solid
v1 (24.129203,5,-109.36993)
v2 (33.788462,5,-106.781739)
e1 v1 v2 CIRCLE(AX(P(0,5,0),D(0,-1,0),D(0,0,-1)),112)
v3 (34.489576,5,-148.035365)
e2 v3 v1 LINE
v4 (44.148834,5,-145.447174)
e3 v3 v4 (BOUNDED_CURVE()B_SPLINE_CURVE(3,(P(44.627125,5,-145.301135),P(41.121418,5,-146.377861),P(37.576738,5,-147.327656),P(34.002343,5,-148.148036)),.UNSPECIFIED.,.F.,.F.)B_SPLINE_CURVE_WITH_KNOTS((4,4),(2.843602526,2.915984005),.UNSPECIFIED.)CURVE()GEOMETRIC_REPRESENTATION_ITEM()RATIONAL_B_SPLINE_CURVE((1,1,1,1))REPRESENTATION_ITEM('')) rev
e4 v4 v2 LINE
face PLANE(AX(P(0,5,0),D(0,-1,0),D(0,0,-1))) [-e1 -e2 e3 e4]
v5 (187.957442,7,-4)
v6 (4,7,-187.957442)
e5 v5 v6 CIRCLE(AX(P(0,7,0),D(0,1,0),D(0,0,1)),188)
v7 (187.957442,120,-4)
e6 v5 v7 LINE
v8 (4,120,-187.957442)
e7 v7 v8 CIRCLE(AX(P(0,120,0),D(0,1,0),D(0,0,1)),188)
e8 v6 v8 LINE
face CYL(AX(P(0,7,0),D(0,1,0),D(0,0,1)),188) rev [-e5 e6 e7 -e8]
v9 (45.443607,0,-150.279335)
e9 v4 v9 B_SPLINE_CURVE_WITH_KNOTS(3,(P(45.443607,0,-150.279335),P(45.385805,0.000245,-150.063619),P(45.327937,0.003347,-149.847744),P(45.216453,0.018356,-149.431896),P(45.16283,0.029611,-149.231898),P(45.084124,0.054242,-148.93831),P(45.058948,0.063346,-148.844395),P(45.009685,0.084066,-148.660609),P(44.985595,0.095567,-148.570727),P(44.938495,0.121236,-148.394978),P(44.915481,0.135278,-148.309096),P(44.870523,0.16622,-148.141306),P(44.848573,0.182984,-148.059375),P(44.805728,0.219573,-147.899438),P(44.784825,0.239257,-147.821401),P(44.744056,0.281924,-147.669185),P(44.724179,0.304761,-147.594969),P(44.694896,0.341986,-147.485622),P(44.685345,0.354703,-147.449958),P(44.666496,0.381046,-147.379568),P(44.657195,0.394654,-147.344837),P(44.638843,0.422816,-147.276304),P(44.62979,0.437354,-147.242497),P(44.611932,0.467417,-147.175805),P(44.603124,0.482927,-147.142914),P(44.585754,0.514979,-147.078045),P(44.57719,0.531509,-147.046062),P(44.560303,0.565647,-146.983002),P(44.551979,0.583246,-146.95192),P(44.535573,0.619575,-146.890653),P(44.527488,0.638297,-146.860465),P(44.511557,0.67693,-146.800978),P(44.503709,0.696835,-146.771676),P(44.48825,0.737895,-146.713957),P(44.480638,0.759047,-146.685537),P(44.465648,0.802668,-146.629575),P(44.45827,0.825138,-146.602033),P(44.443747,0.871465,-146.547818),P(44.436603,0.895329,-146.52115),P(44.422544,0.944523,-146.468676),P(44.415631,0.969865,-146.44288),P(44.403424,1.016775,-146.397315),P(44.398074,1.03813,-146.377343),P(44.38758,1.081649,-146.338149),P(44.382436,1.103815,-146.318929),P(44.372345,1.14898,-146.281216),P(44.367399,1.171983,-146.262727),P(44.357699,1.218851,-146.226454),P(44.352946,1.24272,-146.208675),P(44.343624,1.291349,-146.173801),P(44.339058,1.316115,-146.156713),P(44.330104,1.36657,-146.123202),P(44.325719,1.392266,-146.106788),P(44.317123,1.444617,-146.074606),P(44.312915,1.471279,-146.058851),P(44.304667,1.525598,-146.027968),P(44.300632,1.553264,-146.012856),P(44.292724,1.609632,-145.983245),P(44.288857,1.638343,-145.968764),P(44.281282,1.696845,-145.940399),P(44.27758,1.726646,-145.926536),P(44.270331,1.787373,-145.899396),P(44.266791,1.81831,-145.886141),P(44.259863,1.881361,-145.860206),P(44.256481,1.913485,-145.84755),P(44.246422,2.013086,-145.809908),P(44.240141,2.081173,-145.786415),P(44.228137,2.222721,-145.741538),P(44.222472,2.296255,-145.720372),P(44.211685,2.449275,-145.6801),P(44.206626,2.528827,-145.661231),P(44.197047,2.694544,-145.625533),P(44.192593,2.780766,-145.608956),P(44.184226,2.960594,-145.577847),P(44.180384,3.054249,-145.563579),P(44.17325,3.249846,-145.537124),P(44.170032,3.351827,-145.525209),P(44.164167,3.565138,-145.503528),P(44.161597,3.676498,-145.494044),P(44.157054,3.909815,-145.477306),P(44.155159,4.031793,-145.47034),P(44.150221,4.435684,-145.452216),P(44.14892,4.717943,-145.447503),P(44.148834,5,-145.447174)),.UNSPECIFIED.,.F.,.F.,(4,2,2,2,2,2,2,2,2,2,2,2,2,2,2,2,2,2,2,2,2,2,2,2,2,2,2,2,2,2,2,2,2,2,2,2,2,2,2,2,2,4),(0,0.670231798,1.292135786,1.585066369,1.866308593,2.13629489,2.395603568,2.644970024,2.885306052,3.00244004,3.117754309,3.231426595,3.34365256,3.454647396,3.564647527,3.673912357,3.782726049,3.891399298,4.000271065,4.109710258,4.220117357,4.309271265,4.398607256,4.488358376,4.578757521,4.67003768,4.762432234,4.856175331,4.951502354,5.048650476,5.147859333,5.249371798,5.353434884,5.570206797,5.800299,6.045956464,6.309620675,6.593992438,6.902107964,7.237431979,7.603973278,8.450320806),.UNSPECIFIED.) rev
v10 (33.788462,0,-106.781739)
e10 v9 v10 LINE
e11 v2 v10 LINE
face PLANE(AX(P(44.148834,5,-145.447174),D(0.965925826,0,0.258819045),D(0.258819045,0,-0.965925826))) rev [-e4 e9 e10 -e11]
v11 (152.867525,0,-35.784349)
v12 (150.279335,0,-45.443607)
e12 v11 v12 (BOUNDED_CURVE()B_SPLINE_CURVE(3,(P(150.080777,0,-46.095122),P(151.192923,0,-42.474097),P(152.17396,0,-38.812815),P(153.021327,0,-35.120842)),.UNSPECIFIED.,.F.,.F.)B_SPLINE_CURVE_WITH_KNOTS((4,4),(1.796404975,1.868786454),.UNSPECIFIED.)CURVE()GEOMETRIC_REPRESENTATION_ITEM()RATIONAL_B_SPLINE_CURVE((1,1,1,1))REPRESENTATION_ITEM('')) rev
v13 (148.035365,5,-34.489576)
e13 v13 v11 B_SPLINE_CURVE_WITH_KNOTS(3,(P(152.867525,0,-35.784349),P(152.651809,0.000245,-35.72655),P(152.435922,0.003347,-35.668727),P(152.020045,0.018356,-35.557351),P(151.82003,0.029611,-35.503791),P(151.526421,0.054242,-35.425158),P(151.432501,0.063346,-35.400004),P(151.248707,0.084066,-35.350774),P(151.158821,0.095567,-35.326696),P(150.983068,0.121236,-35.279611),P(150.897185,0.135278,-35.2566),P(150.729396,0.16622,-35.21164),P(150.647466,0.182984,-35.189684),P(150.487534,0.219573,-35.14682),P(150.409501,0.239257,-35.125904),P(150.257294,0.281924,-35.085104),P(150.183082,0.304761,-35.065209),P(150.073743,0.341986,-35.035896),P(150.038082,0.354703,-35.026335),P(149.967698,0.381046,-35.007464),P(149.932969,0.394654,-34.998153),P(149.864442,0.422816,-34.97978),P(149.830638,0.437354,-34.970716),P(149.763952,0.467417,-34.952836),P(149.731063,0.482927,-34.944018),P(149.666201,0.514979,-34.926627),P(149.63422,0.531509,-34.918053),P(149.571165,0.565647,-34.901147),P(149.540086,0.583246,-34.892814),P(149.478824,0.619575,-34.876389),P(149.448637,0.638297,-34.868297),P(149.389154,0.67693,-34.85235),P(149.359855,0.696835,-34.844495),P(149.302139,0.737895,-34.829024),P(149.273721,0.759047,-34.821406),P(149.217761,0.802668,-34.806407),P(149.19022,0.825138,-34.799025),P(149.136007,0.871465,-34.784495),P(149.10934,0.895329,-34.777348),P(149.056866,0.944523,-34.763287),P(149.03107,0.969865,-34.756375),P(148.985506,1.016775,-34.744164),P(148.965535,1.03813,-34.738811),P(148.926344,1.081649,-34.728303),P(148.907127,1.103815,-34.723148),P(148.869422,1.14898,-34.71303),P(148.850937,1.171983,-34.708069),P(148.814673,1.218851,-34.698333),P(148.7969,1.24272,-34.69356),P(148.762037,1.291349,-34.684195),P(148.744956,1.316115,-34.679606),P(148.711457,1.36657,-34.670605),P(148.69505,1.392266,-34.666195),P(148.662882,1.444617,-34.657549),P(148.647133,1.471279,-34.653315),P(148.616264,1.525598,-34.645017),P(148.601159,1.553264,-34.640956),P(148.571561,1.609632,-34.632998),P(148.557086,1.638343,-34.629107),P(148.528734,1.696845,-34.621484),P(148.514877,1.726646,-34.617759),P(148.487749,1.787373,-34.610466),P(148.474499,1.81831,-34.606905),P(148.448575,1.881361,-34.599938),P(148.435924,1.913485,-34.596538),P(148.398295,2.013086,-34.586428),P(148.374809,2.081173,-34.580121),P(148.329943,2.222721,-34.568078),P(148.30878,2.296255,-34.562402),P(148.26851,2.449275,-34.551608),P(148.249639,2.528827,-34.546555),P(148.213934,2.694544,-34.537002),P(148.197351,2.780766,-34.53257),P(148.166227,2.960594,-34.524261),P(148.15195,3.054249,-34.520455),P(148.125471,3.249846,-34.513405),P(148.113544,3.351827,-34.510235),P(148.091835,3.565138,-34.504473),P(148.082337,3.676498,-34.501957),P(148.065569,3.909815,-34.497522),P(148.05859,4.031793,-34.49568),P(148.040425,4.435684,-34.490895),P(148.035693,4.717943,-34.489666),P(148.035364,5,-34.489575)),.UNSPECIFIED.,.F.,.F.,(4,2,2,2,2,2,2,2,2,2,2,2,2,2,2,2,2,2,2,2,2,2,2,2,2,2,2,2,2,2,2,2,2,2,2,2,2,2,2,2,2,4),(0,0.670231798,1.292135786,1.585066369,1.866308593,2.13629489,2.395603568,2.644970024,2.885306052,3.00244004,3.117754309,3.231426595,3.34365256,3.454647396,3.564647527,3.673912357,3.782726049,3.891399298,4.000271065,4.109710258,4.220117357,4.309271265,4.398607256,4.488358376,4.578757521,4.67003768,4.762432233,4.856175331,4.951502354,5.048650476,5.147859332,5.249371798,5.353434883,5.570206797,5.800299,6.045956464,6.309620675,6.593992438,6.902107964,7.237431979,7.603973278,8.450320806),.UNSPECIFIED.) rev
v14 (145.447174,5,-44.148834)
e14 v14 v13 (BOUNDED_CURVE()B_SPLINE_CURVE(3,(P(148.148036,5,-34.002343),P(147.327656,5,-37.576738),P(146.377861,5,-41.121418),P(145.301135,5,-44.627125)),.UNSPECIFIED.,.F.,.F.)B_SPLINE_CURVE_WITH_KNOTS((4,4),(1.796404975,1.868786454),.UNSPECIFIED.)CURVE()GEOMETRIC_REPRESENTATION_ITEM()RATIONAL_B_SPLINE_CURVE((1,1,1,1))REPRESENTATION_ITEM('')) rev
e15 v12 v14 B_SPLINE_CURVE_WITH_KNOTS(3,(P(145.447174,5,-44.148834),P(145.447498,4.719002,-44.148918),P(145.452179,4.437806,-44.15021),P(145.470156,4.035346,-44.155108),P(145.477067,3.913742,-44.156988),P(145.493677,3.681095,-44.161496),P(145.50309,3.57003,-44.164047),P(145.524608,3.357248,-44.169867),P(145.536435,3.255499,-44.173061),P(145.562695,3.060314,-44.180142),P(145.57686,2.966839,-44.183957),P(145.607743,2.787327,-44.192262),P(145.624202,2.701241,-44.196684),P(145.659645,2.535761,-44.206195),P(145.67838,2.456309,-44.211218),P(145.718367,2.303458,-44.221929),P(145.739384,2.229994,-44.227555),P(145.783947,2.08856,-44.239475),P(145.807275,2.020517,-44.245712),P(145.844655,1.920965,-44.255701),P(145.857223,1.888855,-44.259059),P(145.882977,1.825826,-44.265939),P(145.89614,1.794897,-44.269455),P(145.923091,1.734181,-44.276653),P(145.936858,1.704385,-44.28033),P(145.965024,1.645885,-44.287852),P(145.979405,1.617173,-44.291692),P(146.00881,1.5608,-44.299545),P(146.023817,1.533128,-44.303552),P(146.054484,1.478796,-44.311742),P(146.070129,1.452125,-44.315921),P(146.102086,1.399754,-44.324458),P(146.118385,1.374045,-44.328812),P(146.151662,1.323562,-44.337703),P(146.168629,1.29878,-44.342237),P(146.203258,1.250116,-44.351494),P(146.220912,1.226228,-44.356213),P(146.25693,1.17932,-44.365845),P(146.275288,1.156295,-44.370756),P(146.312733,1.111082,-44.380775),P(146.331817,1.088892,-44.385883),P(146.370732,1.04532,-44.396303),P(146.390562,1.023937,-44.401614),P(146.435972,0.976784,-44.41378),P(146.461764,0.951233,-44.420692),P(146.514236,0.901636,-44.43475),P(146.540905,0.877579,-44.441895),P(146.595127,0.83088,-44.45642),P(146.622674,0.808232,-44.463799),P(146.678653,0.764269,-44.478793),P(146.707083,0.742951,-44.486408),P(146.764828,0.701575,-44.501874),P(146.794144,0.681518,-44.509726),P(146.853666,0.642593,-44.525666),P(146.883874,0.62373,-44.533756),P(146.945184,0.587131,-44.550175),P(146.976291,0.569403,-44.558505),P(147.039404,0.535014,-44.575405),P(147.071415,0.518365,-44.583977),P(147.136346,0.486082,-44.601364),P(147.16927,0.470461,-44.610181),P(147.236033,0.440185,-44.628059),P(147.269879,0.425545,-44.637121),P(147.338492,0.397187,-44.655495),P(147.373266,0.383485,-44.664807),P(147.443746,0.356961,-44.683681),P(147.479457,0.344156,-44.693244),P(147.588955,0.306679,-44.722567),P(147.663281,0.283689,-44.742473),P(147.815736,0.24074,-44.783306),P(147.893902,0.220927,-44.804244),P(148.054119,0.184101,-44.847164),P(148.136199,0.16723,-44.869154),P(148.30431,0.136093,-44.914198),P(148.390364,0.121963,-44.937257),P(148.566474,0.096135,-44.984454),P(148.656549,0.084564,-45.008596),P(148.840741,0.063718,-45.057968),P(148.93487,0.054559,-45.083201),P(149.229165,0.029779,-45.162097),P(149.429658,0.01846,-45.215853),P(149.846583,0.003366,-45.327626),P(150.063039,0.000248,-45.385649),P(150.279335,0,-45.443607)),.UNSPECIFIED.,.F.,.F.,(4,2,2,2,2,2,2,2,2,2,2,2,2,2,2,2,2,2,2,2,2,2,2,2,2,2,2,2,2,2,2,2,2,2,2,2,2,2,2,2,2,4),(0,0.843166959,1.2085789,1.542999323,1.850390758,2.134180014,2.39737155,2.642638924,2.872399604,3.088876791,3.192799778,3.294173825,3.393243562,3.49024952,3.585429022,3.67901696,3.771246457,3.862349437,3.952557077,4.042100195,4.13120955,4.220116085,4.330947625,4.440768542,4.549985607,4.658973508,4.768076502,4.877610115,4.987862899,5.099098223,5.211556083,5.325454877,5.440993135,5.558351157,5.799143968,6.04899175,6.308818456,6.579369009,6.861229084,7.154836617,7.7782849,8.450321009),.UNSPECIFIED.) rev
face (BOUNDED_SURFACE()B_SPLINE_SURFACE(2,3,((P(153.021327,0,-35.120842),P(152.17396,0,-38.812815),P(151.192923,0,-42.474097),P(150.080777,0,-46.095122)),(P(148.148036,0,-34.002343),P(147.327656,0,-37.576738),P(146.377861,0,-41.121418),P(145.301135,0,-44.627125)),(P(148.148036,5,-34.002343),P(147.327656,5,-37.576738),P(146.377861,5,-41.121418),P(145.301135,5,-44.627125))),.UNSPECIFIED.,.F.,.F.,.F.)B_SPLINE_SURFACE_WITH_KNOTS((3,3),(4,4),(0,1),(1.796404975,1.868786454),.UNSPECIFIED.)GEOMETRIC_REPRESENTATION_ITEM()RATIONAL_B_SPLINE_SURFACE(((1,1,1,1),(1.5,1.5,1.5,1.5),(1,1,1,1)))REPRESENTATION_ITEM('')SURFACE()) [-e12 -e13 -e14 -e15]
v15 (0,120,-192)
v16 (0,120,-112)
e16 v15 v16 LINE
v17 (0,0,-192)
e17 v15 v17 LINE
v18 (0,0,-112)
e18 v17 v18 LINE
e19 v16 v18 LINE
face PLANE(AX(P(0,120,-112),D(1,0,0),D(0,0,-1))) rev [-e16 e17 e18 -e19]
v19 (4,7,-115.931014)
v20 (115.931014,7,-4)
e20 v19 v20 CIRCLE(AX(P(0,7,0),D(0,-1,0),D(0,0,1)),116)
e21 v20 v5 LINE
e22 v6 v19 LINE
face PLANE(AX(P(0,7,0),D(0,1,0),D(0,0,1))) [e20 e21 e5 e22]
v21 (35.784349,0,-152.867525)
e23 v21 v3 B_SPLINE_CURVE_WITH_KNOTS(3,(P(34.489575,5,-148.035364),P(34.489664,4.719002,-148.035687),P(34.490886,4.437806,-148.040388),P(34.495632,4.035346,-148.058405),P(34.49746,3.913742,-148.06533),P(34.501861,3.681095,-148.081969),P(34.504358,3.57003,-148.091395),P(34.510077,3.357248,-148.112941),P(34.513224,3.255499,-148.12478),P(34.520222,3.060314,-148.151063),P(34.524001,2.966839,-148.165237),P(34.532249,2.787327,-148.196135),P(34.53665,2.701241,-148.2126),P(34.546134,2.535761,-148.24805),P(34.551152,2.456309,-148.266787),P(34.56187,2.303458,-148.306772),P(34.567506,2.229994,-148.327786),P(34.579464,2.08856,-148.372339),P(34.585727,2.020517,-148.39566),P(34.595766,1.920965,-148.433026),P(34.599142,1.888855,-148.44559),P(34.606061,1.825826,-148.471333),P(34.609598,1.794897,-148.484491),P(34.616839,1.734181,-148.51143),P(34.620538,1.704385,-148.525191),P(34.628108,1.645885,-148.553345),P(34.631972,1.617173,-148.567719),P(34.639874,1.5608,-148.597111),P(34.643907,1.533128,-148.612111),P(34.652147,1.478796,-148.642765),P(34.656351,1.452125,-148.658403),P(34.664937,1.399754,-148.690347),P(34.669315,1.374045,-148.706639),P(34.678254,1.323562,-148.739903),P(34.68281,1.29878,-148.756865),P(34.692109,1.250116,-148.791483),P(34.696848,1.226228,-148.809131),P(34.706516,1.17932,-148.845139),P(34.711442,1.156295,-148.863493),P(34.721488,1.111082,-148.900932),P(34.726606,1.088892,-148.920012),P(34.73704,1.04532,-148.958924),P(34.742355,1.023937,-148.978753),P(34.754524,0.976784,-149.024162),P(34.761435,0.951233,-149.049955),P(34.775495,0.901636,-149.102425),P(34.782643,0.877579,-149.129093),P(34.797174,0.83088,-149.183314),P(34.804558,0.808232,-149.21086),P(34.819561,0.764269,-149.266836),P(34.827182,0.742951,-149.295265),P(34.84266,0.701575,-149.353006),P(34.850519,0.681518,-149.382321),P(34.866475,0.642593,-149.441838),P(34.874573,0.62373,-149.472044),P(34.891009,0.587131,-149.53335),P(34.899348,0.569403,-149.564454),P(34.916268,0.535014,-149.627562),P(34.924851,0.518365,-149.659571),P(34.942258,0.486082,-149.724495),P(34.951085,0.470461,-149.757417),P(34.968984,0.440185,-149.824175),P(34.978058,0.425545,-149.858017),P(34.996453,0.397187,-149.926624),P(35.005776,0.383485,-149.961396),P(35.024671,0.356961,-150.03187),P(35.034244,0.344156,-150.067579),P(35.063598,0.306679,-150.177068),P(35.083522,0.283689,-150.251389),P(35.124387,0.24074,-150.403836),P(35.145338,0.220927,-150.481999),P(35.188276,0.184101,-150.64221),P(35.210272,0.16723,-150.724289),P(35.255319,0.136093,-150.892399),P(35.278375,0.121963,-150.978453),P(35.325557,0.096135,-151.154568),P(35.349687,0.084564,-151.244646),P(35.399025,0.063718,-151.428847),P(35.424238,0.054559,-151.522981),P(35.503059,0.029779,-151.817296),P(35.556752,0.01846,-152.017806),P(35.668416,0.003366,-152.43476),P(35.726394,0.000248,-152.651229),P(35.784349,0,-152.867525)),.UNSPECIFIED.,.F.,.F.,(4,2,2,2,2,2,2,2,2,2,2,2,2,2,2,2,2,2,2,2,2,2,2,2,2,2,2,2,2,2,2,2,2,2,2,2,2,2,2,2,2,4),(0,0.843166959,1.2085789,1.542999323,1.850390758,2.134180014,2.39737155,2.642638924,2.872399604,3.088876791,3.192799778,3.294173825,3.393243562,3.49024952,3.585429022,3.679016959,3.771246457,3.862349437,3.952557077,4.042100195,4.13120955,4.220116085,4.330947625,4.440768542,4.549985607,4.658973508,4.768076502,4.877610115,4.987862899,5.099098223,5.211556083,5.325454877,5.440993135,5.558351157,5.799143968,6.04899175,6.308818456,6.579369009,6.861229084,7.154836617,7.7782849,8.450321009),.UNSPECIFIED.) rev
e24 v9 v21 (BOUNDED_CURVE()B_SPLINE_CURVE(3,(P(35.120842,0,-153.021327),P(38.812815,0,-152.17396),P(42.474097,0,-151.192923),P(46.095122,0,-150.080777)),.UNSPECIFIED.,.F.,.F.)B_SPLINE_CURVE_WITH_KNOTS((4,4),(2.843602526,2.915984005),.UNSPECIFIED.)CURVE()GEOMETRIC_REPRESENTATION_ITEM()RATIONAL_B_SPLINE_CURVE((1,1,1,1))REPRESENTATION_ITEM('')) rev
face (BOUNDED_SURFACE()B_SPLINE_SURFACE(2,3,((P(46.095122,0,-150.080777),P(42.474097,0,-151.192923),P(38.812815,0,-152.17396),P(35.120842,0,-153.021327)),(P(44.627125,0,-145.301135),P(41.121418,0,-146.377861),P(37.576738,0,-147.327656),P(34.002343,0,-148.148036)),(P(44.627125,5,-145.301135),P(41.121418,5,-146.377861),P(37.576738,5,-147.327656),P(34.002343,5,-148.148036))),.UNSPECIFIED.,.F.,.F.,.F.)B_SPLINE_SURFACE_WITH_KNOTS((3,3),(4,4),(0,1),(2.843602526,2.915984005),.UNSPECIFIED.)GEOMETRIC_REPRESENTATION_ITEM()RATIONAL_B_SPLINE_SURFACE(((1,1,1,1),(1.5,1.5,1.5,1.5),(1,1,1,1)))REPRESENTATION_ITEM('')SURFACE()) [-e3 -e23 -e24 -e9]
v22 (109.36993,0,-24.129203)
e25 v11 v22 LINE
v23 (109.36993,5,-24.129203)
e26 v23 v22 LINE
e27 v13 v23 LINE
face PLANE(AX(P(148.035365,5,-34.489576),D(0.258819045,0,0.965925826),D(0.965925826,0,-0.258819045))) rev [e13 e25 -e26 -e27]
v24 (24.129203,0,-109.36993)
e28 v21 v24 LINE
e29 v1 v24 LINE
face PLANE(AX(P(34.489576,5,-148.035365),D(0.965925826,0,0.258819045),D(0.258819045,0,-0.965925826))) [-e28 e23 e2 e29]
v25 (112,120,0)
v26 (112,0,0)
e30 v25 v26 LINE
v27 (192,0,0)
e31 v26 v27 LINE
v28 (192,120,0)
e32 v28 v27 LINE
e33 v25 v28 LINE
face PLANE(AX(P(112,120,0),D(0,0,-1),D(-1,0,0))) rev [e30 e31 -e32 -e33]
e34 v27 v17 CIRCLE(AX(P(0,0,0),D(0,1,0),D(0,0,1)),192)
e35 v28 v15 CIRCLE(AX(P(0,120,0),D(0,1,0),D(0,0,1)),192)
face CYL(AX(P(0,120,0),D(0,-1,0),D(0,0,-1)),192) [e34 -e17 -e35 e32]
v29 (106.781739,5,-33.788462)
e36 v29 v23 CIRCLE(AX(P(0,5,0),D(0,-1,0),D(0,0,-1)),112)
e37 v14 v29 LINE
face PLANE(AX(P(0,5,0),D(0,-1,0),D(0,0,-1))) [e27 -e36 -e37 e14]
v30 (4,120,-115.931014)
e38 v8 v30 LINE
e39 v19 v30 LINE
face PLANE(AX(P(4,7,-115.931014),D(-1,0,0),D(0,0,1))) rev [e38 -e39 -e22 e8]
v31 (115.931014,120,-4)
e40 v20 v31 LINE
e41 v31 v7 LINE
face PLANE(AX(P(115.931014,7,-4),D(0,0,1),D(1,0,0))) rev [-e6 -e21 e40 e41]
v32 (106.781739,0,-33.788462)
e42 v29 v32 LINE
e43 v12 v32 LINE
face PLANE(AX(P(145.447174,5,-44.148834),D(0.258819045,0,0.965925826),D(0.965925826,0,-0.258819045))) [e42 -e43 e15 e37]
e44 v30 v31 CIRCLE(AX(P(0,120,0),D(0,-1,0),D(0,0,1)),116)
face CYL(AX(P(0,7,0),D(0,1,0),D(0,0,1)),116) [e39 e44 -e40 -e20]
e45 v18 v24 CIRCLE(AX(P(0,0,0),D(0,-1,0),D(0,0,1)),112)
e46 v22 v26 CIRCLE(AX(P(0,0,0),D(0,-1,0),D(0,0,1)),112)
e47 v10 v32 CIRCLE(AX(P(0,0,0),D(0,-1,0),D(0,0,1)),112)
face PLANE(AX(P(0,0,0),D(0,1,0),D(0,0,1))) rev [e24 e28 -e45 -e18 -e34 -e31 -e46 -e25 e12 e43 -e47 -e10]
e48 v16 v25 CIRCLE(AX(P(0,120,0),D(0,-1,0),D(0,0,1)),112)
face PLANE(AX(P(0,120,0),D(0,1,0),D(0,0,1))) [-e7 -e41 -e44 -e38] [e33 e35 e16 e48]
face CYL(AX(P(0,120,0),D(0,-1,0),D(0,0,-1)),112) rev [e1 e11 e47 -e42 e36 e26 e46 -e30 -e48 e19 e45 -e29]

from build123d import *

# Parameters (mm, degrees)
ESTRUSIONE_ESTRUSIONE1_DEPTH = 120
TAGLIO_ESTRUSIONE1_DEPTH     = 113
TAGLIO_ESTRUSIONE2_DEPTH     = 5
RACCORDO1_SIZE               = 5


with BuildPart() as part:
    # Schizzo1 → Estrusione-Estrusione1 (new body)
    with BuildSketch(Plane(origin=(0, 0, 0), x_dir=(1, 0, 0), z_dir=(0, 1, 0))):
        with BuildLine():
            Line((0, 112), (0, 192))
            ThreePointArc((0, 192), (135.764501988, 135.764501988), (192, 0))
            Line((192, 0), (112, 0))
            ThreePointArc((112, 0), (79.195959493, 79.195959493), (0, 112))
        make_face()
    extrude(amount=ESTRUSIONE_ESTRUSIONE1_DEPTH)

    # Schizzo2 → Taglio-Estrusione1 (cut)
    with BuildSketch(Plane(origin=(0, 120, 0), x_dir=(1, 0, 0), z_dir=(0, 1, 0))):
        with BuildLine():
            Line((4, 115.93101397), (4, 187.957441992))
            ThreePointArc((4, 187.957441992), (132.936074863, 132.936074863), (187.957441992, 4))
            Line((187.957441992, 4), (115.93101397, 4))
            ThreePointArc((115.93101397, 4), (82.024386618, 82.024386618), (4, 115.93101397))
        make_face()
    extrude(amount=-TAGLIO_ESTRUSIONE1_DEPTH, mode=Mode.SUBTRACT)

    # Schizzo3 → Taglio-Estrusione2 (cut)
    with BuildSketch(Plane.XZ):
        with BuildLine():
            Line((34.489575502, -148.035364632), (24.129203459, -109.369929782))
            ThreePointArc((24.129203459, -109.369929782), (28.987733051, -108.183692544), (33.788461722, -106.781739331))
            Line((33.788461722, -106.781739331), (44.148833765, -145.447174181))
            ThreePointArc((44.148833765, -145.447174181), (39.340494856, -146.820725596), (34.489575502, -148.035364632))
        make_face()
        with BuildLine():
            Line((145.447174181, -44.148833765), (106.781739331, -33.788461722))
            ThreePointArc((106.781739331, -33.788461722), (108.183692544, -28.987733051), (109.369929782, -24.129203459))
            Line((109.369929782, -24.129203459), (148.035364632, -34.489575502))
            ThreePointArc((148.035364632, -34.489575502), (146.820725596, -39.340494856), (145.447174181, -44.148833765))
        make_face()
    extrude(amount=-TAGLIO_ESTRUSIONE2_DEPTH, mode=Mode.SUBTRACT)

    # Raccordo1
    # a fillet whose section is not a circle: 5 mm, written as the material it takes off along each edge
    with BuildSketch(Plane(origin=(0, 0, 0), x_dir=(0.9892644198784365, 0, -0.14613660582681076), z_dir=(0.14613660582681076, 0, 0.9892644198784365))) as raccordo1_piece_1_section:
        with BuildLine():
            Bezier((152 + RACCORDO1_SIZE, 0), (152, 0), (152, RACCORDO1_SIZE), weights=[1, 1.5, 1])
            Line((152, RACCORDO1_SIZE), (152, 0))
            Line((152, 0), (152 + RACCORDO1_SIZE, 0))
        make_face()
    raccordo1_piece_1 = revolve(axis=Axis((0, 0, 0), (0, 1, 0)), revolution_arc=13.193793896, mode=Mode.PRIVATE)
    raccordo1_piece_1 = split(raccordo1_piece_1, bisect_by=Plane(origin=(-1.294095226, 0, -4.829629131), z_dir=(0.2588190451025214, 0, 0.9659258262890682)), keep=Keep.TOP, mode=Mode.PRIVATE)
    raccordo1_piece_1 = split(raccordo1_piece_1, bisect_by=Plane(origin=(1.294095225, 0, 4.829629131), z_dir=(-0.25881904510252096, 0, -0.9659258262890682)), keep=Keep.TOP, mode=Mode.PRIVATE)
    add(raccordo1_piece_1, mode=Mode.SUBTRACT)
    with BuildSketch(Plane(origin=(0, 0, 0), x_dir=(0.36807419687030923, 0, -0.9297964215882295), z_dir=(0.9297964215882295, 0, 0.36807419687030923))) as raccordo1_piece_2_section:
        with BuildLine():
            Bezier((152 + RACCORDO1_SIZE, 0), (152, 0), (152, RACCORDO1_SIZE), weights=[1, 1.5, 1])
            Line((152, RACCORDO1_SIZE), (152, 0))
            Line((152, 0), (152 + RACCORDO1_SIZE, 0))
        make_face()
    raccordo1_piece_2 = revolve(axis=Axis((0, 0, 0), (0, 1, 0)), revolution_arc=13.193793896, mode=Mode.PRIVATE)
    raccordo1_piece_2 = split(raccordo1_piece_2, bisect_by=Plane(origin=(-4.829629131, 0, -1.294095225), z_dir=(0.965925826289068, 0, 0.2588190451025222)), keep=Keep.TOP, mode=Mode.PRIVATE)
    raccordo1_piece_2 = split(raccordo1_piece_2, bisect_by=Plane(origin=(4.829629131, 0, 1.294095226), z_dir=(-0.965925826289068, 0, -0.2588190451025218)), keep=Keep.TOP, mode=Mode.PRIVATE)
    add(raccordo1_piece_2, mode=Mode.SUBTRACT)


solid = part.part
